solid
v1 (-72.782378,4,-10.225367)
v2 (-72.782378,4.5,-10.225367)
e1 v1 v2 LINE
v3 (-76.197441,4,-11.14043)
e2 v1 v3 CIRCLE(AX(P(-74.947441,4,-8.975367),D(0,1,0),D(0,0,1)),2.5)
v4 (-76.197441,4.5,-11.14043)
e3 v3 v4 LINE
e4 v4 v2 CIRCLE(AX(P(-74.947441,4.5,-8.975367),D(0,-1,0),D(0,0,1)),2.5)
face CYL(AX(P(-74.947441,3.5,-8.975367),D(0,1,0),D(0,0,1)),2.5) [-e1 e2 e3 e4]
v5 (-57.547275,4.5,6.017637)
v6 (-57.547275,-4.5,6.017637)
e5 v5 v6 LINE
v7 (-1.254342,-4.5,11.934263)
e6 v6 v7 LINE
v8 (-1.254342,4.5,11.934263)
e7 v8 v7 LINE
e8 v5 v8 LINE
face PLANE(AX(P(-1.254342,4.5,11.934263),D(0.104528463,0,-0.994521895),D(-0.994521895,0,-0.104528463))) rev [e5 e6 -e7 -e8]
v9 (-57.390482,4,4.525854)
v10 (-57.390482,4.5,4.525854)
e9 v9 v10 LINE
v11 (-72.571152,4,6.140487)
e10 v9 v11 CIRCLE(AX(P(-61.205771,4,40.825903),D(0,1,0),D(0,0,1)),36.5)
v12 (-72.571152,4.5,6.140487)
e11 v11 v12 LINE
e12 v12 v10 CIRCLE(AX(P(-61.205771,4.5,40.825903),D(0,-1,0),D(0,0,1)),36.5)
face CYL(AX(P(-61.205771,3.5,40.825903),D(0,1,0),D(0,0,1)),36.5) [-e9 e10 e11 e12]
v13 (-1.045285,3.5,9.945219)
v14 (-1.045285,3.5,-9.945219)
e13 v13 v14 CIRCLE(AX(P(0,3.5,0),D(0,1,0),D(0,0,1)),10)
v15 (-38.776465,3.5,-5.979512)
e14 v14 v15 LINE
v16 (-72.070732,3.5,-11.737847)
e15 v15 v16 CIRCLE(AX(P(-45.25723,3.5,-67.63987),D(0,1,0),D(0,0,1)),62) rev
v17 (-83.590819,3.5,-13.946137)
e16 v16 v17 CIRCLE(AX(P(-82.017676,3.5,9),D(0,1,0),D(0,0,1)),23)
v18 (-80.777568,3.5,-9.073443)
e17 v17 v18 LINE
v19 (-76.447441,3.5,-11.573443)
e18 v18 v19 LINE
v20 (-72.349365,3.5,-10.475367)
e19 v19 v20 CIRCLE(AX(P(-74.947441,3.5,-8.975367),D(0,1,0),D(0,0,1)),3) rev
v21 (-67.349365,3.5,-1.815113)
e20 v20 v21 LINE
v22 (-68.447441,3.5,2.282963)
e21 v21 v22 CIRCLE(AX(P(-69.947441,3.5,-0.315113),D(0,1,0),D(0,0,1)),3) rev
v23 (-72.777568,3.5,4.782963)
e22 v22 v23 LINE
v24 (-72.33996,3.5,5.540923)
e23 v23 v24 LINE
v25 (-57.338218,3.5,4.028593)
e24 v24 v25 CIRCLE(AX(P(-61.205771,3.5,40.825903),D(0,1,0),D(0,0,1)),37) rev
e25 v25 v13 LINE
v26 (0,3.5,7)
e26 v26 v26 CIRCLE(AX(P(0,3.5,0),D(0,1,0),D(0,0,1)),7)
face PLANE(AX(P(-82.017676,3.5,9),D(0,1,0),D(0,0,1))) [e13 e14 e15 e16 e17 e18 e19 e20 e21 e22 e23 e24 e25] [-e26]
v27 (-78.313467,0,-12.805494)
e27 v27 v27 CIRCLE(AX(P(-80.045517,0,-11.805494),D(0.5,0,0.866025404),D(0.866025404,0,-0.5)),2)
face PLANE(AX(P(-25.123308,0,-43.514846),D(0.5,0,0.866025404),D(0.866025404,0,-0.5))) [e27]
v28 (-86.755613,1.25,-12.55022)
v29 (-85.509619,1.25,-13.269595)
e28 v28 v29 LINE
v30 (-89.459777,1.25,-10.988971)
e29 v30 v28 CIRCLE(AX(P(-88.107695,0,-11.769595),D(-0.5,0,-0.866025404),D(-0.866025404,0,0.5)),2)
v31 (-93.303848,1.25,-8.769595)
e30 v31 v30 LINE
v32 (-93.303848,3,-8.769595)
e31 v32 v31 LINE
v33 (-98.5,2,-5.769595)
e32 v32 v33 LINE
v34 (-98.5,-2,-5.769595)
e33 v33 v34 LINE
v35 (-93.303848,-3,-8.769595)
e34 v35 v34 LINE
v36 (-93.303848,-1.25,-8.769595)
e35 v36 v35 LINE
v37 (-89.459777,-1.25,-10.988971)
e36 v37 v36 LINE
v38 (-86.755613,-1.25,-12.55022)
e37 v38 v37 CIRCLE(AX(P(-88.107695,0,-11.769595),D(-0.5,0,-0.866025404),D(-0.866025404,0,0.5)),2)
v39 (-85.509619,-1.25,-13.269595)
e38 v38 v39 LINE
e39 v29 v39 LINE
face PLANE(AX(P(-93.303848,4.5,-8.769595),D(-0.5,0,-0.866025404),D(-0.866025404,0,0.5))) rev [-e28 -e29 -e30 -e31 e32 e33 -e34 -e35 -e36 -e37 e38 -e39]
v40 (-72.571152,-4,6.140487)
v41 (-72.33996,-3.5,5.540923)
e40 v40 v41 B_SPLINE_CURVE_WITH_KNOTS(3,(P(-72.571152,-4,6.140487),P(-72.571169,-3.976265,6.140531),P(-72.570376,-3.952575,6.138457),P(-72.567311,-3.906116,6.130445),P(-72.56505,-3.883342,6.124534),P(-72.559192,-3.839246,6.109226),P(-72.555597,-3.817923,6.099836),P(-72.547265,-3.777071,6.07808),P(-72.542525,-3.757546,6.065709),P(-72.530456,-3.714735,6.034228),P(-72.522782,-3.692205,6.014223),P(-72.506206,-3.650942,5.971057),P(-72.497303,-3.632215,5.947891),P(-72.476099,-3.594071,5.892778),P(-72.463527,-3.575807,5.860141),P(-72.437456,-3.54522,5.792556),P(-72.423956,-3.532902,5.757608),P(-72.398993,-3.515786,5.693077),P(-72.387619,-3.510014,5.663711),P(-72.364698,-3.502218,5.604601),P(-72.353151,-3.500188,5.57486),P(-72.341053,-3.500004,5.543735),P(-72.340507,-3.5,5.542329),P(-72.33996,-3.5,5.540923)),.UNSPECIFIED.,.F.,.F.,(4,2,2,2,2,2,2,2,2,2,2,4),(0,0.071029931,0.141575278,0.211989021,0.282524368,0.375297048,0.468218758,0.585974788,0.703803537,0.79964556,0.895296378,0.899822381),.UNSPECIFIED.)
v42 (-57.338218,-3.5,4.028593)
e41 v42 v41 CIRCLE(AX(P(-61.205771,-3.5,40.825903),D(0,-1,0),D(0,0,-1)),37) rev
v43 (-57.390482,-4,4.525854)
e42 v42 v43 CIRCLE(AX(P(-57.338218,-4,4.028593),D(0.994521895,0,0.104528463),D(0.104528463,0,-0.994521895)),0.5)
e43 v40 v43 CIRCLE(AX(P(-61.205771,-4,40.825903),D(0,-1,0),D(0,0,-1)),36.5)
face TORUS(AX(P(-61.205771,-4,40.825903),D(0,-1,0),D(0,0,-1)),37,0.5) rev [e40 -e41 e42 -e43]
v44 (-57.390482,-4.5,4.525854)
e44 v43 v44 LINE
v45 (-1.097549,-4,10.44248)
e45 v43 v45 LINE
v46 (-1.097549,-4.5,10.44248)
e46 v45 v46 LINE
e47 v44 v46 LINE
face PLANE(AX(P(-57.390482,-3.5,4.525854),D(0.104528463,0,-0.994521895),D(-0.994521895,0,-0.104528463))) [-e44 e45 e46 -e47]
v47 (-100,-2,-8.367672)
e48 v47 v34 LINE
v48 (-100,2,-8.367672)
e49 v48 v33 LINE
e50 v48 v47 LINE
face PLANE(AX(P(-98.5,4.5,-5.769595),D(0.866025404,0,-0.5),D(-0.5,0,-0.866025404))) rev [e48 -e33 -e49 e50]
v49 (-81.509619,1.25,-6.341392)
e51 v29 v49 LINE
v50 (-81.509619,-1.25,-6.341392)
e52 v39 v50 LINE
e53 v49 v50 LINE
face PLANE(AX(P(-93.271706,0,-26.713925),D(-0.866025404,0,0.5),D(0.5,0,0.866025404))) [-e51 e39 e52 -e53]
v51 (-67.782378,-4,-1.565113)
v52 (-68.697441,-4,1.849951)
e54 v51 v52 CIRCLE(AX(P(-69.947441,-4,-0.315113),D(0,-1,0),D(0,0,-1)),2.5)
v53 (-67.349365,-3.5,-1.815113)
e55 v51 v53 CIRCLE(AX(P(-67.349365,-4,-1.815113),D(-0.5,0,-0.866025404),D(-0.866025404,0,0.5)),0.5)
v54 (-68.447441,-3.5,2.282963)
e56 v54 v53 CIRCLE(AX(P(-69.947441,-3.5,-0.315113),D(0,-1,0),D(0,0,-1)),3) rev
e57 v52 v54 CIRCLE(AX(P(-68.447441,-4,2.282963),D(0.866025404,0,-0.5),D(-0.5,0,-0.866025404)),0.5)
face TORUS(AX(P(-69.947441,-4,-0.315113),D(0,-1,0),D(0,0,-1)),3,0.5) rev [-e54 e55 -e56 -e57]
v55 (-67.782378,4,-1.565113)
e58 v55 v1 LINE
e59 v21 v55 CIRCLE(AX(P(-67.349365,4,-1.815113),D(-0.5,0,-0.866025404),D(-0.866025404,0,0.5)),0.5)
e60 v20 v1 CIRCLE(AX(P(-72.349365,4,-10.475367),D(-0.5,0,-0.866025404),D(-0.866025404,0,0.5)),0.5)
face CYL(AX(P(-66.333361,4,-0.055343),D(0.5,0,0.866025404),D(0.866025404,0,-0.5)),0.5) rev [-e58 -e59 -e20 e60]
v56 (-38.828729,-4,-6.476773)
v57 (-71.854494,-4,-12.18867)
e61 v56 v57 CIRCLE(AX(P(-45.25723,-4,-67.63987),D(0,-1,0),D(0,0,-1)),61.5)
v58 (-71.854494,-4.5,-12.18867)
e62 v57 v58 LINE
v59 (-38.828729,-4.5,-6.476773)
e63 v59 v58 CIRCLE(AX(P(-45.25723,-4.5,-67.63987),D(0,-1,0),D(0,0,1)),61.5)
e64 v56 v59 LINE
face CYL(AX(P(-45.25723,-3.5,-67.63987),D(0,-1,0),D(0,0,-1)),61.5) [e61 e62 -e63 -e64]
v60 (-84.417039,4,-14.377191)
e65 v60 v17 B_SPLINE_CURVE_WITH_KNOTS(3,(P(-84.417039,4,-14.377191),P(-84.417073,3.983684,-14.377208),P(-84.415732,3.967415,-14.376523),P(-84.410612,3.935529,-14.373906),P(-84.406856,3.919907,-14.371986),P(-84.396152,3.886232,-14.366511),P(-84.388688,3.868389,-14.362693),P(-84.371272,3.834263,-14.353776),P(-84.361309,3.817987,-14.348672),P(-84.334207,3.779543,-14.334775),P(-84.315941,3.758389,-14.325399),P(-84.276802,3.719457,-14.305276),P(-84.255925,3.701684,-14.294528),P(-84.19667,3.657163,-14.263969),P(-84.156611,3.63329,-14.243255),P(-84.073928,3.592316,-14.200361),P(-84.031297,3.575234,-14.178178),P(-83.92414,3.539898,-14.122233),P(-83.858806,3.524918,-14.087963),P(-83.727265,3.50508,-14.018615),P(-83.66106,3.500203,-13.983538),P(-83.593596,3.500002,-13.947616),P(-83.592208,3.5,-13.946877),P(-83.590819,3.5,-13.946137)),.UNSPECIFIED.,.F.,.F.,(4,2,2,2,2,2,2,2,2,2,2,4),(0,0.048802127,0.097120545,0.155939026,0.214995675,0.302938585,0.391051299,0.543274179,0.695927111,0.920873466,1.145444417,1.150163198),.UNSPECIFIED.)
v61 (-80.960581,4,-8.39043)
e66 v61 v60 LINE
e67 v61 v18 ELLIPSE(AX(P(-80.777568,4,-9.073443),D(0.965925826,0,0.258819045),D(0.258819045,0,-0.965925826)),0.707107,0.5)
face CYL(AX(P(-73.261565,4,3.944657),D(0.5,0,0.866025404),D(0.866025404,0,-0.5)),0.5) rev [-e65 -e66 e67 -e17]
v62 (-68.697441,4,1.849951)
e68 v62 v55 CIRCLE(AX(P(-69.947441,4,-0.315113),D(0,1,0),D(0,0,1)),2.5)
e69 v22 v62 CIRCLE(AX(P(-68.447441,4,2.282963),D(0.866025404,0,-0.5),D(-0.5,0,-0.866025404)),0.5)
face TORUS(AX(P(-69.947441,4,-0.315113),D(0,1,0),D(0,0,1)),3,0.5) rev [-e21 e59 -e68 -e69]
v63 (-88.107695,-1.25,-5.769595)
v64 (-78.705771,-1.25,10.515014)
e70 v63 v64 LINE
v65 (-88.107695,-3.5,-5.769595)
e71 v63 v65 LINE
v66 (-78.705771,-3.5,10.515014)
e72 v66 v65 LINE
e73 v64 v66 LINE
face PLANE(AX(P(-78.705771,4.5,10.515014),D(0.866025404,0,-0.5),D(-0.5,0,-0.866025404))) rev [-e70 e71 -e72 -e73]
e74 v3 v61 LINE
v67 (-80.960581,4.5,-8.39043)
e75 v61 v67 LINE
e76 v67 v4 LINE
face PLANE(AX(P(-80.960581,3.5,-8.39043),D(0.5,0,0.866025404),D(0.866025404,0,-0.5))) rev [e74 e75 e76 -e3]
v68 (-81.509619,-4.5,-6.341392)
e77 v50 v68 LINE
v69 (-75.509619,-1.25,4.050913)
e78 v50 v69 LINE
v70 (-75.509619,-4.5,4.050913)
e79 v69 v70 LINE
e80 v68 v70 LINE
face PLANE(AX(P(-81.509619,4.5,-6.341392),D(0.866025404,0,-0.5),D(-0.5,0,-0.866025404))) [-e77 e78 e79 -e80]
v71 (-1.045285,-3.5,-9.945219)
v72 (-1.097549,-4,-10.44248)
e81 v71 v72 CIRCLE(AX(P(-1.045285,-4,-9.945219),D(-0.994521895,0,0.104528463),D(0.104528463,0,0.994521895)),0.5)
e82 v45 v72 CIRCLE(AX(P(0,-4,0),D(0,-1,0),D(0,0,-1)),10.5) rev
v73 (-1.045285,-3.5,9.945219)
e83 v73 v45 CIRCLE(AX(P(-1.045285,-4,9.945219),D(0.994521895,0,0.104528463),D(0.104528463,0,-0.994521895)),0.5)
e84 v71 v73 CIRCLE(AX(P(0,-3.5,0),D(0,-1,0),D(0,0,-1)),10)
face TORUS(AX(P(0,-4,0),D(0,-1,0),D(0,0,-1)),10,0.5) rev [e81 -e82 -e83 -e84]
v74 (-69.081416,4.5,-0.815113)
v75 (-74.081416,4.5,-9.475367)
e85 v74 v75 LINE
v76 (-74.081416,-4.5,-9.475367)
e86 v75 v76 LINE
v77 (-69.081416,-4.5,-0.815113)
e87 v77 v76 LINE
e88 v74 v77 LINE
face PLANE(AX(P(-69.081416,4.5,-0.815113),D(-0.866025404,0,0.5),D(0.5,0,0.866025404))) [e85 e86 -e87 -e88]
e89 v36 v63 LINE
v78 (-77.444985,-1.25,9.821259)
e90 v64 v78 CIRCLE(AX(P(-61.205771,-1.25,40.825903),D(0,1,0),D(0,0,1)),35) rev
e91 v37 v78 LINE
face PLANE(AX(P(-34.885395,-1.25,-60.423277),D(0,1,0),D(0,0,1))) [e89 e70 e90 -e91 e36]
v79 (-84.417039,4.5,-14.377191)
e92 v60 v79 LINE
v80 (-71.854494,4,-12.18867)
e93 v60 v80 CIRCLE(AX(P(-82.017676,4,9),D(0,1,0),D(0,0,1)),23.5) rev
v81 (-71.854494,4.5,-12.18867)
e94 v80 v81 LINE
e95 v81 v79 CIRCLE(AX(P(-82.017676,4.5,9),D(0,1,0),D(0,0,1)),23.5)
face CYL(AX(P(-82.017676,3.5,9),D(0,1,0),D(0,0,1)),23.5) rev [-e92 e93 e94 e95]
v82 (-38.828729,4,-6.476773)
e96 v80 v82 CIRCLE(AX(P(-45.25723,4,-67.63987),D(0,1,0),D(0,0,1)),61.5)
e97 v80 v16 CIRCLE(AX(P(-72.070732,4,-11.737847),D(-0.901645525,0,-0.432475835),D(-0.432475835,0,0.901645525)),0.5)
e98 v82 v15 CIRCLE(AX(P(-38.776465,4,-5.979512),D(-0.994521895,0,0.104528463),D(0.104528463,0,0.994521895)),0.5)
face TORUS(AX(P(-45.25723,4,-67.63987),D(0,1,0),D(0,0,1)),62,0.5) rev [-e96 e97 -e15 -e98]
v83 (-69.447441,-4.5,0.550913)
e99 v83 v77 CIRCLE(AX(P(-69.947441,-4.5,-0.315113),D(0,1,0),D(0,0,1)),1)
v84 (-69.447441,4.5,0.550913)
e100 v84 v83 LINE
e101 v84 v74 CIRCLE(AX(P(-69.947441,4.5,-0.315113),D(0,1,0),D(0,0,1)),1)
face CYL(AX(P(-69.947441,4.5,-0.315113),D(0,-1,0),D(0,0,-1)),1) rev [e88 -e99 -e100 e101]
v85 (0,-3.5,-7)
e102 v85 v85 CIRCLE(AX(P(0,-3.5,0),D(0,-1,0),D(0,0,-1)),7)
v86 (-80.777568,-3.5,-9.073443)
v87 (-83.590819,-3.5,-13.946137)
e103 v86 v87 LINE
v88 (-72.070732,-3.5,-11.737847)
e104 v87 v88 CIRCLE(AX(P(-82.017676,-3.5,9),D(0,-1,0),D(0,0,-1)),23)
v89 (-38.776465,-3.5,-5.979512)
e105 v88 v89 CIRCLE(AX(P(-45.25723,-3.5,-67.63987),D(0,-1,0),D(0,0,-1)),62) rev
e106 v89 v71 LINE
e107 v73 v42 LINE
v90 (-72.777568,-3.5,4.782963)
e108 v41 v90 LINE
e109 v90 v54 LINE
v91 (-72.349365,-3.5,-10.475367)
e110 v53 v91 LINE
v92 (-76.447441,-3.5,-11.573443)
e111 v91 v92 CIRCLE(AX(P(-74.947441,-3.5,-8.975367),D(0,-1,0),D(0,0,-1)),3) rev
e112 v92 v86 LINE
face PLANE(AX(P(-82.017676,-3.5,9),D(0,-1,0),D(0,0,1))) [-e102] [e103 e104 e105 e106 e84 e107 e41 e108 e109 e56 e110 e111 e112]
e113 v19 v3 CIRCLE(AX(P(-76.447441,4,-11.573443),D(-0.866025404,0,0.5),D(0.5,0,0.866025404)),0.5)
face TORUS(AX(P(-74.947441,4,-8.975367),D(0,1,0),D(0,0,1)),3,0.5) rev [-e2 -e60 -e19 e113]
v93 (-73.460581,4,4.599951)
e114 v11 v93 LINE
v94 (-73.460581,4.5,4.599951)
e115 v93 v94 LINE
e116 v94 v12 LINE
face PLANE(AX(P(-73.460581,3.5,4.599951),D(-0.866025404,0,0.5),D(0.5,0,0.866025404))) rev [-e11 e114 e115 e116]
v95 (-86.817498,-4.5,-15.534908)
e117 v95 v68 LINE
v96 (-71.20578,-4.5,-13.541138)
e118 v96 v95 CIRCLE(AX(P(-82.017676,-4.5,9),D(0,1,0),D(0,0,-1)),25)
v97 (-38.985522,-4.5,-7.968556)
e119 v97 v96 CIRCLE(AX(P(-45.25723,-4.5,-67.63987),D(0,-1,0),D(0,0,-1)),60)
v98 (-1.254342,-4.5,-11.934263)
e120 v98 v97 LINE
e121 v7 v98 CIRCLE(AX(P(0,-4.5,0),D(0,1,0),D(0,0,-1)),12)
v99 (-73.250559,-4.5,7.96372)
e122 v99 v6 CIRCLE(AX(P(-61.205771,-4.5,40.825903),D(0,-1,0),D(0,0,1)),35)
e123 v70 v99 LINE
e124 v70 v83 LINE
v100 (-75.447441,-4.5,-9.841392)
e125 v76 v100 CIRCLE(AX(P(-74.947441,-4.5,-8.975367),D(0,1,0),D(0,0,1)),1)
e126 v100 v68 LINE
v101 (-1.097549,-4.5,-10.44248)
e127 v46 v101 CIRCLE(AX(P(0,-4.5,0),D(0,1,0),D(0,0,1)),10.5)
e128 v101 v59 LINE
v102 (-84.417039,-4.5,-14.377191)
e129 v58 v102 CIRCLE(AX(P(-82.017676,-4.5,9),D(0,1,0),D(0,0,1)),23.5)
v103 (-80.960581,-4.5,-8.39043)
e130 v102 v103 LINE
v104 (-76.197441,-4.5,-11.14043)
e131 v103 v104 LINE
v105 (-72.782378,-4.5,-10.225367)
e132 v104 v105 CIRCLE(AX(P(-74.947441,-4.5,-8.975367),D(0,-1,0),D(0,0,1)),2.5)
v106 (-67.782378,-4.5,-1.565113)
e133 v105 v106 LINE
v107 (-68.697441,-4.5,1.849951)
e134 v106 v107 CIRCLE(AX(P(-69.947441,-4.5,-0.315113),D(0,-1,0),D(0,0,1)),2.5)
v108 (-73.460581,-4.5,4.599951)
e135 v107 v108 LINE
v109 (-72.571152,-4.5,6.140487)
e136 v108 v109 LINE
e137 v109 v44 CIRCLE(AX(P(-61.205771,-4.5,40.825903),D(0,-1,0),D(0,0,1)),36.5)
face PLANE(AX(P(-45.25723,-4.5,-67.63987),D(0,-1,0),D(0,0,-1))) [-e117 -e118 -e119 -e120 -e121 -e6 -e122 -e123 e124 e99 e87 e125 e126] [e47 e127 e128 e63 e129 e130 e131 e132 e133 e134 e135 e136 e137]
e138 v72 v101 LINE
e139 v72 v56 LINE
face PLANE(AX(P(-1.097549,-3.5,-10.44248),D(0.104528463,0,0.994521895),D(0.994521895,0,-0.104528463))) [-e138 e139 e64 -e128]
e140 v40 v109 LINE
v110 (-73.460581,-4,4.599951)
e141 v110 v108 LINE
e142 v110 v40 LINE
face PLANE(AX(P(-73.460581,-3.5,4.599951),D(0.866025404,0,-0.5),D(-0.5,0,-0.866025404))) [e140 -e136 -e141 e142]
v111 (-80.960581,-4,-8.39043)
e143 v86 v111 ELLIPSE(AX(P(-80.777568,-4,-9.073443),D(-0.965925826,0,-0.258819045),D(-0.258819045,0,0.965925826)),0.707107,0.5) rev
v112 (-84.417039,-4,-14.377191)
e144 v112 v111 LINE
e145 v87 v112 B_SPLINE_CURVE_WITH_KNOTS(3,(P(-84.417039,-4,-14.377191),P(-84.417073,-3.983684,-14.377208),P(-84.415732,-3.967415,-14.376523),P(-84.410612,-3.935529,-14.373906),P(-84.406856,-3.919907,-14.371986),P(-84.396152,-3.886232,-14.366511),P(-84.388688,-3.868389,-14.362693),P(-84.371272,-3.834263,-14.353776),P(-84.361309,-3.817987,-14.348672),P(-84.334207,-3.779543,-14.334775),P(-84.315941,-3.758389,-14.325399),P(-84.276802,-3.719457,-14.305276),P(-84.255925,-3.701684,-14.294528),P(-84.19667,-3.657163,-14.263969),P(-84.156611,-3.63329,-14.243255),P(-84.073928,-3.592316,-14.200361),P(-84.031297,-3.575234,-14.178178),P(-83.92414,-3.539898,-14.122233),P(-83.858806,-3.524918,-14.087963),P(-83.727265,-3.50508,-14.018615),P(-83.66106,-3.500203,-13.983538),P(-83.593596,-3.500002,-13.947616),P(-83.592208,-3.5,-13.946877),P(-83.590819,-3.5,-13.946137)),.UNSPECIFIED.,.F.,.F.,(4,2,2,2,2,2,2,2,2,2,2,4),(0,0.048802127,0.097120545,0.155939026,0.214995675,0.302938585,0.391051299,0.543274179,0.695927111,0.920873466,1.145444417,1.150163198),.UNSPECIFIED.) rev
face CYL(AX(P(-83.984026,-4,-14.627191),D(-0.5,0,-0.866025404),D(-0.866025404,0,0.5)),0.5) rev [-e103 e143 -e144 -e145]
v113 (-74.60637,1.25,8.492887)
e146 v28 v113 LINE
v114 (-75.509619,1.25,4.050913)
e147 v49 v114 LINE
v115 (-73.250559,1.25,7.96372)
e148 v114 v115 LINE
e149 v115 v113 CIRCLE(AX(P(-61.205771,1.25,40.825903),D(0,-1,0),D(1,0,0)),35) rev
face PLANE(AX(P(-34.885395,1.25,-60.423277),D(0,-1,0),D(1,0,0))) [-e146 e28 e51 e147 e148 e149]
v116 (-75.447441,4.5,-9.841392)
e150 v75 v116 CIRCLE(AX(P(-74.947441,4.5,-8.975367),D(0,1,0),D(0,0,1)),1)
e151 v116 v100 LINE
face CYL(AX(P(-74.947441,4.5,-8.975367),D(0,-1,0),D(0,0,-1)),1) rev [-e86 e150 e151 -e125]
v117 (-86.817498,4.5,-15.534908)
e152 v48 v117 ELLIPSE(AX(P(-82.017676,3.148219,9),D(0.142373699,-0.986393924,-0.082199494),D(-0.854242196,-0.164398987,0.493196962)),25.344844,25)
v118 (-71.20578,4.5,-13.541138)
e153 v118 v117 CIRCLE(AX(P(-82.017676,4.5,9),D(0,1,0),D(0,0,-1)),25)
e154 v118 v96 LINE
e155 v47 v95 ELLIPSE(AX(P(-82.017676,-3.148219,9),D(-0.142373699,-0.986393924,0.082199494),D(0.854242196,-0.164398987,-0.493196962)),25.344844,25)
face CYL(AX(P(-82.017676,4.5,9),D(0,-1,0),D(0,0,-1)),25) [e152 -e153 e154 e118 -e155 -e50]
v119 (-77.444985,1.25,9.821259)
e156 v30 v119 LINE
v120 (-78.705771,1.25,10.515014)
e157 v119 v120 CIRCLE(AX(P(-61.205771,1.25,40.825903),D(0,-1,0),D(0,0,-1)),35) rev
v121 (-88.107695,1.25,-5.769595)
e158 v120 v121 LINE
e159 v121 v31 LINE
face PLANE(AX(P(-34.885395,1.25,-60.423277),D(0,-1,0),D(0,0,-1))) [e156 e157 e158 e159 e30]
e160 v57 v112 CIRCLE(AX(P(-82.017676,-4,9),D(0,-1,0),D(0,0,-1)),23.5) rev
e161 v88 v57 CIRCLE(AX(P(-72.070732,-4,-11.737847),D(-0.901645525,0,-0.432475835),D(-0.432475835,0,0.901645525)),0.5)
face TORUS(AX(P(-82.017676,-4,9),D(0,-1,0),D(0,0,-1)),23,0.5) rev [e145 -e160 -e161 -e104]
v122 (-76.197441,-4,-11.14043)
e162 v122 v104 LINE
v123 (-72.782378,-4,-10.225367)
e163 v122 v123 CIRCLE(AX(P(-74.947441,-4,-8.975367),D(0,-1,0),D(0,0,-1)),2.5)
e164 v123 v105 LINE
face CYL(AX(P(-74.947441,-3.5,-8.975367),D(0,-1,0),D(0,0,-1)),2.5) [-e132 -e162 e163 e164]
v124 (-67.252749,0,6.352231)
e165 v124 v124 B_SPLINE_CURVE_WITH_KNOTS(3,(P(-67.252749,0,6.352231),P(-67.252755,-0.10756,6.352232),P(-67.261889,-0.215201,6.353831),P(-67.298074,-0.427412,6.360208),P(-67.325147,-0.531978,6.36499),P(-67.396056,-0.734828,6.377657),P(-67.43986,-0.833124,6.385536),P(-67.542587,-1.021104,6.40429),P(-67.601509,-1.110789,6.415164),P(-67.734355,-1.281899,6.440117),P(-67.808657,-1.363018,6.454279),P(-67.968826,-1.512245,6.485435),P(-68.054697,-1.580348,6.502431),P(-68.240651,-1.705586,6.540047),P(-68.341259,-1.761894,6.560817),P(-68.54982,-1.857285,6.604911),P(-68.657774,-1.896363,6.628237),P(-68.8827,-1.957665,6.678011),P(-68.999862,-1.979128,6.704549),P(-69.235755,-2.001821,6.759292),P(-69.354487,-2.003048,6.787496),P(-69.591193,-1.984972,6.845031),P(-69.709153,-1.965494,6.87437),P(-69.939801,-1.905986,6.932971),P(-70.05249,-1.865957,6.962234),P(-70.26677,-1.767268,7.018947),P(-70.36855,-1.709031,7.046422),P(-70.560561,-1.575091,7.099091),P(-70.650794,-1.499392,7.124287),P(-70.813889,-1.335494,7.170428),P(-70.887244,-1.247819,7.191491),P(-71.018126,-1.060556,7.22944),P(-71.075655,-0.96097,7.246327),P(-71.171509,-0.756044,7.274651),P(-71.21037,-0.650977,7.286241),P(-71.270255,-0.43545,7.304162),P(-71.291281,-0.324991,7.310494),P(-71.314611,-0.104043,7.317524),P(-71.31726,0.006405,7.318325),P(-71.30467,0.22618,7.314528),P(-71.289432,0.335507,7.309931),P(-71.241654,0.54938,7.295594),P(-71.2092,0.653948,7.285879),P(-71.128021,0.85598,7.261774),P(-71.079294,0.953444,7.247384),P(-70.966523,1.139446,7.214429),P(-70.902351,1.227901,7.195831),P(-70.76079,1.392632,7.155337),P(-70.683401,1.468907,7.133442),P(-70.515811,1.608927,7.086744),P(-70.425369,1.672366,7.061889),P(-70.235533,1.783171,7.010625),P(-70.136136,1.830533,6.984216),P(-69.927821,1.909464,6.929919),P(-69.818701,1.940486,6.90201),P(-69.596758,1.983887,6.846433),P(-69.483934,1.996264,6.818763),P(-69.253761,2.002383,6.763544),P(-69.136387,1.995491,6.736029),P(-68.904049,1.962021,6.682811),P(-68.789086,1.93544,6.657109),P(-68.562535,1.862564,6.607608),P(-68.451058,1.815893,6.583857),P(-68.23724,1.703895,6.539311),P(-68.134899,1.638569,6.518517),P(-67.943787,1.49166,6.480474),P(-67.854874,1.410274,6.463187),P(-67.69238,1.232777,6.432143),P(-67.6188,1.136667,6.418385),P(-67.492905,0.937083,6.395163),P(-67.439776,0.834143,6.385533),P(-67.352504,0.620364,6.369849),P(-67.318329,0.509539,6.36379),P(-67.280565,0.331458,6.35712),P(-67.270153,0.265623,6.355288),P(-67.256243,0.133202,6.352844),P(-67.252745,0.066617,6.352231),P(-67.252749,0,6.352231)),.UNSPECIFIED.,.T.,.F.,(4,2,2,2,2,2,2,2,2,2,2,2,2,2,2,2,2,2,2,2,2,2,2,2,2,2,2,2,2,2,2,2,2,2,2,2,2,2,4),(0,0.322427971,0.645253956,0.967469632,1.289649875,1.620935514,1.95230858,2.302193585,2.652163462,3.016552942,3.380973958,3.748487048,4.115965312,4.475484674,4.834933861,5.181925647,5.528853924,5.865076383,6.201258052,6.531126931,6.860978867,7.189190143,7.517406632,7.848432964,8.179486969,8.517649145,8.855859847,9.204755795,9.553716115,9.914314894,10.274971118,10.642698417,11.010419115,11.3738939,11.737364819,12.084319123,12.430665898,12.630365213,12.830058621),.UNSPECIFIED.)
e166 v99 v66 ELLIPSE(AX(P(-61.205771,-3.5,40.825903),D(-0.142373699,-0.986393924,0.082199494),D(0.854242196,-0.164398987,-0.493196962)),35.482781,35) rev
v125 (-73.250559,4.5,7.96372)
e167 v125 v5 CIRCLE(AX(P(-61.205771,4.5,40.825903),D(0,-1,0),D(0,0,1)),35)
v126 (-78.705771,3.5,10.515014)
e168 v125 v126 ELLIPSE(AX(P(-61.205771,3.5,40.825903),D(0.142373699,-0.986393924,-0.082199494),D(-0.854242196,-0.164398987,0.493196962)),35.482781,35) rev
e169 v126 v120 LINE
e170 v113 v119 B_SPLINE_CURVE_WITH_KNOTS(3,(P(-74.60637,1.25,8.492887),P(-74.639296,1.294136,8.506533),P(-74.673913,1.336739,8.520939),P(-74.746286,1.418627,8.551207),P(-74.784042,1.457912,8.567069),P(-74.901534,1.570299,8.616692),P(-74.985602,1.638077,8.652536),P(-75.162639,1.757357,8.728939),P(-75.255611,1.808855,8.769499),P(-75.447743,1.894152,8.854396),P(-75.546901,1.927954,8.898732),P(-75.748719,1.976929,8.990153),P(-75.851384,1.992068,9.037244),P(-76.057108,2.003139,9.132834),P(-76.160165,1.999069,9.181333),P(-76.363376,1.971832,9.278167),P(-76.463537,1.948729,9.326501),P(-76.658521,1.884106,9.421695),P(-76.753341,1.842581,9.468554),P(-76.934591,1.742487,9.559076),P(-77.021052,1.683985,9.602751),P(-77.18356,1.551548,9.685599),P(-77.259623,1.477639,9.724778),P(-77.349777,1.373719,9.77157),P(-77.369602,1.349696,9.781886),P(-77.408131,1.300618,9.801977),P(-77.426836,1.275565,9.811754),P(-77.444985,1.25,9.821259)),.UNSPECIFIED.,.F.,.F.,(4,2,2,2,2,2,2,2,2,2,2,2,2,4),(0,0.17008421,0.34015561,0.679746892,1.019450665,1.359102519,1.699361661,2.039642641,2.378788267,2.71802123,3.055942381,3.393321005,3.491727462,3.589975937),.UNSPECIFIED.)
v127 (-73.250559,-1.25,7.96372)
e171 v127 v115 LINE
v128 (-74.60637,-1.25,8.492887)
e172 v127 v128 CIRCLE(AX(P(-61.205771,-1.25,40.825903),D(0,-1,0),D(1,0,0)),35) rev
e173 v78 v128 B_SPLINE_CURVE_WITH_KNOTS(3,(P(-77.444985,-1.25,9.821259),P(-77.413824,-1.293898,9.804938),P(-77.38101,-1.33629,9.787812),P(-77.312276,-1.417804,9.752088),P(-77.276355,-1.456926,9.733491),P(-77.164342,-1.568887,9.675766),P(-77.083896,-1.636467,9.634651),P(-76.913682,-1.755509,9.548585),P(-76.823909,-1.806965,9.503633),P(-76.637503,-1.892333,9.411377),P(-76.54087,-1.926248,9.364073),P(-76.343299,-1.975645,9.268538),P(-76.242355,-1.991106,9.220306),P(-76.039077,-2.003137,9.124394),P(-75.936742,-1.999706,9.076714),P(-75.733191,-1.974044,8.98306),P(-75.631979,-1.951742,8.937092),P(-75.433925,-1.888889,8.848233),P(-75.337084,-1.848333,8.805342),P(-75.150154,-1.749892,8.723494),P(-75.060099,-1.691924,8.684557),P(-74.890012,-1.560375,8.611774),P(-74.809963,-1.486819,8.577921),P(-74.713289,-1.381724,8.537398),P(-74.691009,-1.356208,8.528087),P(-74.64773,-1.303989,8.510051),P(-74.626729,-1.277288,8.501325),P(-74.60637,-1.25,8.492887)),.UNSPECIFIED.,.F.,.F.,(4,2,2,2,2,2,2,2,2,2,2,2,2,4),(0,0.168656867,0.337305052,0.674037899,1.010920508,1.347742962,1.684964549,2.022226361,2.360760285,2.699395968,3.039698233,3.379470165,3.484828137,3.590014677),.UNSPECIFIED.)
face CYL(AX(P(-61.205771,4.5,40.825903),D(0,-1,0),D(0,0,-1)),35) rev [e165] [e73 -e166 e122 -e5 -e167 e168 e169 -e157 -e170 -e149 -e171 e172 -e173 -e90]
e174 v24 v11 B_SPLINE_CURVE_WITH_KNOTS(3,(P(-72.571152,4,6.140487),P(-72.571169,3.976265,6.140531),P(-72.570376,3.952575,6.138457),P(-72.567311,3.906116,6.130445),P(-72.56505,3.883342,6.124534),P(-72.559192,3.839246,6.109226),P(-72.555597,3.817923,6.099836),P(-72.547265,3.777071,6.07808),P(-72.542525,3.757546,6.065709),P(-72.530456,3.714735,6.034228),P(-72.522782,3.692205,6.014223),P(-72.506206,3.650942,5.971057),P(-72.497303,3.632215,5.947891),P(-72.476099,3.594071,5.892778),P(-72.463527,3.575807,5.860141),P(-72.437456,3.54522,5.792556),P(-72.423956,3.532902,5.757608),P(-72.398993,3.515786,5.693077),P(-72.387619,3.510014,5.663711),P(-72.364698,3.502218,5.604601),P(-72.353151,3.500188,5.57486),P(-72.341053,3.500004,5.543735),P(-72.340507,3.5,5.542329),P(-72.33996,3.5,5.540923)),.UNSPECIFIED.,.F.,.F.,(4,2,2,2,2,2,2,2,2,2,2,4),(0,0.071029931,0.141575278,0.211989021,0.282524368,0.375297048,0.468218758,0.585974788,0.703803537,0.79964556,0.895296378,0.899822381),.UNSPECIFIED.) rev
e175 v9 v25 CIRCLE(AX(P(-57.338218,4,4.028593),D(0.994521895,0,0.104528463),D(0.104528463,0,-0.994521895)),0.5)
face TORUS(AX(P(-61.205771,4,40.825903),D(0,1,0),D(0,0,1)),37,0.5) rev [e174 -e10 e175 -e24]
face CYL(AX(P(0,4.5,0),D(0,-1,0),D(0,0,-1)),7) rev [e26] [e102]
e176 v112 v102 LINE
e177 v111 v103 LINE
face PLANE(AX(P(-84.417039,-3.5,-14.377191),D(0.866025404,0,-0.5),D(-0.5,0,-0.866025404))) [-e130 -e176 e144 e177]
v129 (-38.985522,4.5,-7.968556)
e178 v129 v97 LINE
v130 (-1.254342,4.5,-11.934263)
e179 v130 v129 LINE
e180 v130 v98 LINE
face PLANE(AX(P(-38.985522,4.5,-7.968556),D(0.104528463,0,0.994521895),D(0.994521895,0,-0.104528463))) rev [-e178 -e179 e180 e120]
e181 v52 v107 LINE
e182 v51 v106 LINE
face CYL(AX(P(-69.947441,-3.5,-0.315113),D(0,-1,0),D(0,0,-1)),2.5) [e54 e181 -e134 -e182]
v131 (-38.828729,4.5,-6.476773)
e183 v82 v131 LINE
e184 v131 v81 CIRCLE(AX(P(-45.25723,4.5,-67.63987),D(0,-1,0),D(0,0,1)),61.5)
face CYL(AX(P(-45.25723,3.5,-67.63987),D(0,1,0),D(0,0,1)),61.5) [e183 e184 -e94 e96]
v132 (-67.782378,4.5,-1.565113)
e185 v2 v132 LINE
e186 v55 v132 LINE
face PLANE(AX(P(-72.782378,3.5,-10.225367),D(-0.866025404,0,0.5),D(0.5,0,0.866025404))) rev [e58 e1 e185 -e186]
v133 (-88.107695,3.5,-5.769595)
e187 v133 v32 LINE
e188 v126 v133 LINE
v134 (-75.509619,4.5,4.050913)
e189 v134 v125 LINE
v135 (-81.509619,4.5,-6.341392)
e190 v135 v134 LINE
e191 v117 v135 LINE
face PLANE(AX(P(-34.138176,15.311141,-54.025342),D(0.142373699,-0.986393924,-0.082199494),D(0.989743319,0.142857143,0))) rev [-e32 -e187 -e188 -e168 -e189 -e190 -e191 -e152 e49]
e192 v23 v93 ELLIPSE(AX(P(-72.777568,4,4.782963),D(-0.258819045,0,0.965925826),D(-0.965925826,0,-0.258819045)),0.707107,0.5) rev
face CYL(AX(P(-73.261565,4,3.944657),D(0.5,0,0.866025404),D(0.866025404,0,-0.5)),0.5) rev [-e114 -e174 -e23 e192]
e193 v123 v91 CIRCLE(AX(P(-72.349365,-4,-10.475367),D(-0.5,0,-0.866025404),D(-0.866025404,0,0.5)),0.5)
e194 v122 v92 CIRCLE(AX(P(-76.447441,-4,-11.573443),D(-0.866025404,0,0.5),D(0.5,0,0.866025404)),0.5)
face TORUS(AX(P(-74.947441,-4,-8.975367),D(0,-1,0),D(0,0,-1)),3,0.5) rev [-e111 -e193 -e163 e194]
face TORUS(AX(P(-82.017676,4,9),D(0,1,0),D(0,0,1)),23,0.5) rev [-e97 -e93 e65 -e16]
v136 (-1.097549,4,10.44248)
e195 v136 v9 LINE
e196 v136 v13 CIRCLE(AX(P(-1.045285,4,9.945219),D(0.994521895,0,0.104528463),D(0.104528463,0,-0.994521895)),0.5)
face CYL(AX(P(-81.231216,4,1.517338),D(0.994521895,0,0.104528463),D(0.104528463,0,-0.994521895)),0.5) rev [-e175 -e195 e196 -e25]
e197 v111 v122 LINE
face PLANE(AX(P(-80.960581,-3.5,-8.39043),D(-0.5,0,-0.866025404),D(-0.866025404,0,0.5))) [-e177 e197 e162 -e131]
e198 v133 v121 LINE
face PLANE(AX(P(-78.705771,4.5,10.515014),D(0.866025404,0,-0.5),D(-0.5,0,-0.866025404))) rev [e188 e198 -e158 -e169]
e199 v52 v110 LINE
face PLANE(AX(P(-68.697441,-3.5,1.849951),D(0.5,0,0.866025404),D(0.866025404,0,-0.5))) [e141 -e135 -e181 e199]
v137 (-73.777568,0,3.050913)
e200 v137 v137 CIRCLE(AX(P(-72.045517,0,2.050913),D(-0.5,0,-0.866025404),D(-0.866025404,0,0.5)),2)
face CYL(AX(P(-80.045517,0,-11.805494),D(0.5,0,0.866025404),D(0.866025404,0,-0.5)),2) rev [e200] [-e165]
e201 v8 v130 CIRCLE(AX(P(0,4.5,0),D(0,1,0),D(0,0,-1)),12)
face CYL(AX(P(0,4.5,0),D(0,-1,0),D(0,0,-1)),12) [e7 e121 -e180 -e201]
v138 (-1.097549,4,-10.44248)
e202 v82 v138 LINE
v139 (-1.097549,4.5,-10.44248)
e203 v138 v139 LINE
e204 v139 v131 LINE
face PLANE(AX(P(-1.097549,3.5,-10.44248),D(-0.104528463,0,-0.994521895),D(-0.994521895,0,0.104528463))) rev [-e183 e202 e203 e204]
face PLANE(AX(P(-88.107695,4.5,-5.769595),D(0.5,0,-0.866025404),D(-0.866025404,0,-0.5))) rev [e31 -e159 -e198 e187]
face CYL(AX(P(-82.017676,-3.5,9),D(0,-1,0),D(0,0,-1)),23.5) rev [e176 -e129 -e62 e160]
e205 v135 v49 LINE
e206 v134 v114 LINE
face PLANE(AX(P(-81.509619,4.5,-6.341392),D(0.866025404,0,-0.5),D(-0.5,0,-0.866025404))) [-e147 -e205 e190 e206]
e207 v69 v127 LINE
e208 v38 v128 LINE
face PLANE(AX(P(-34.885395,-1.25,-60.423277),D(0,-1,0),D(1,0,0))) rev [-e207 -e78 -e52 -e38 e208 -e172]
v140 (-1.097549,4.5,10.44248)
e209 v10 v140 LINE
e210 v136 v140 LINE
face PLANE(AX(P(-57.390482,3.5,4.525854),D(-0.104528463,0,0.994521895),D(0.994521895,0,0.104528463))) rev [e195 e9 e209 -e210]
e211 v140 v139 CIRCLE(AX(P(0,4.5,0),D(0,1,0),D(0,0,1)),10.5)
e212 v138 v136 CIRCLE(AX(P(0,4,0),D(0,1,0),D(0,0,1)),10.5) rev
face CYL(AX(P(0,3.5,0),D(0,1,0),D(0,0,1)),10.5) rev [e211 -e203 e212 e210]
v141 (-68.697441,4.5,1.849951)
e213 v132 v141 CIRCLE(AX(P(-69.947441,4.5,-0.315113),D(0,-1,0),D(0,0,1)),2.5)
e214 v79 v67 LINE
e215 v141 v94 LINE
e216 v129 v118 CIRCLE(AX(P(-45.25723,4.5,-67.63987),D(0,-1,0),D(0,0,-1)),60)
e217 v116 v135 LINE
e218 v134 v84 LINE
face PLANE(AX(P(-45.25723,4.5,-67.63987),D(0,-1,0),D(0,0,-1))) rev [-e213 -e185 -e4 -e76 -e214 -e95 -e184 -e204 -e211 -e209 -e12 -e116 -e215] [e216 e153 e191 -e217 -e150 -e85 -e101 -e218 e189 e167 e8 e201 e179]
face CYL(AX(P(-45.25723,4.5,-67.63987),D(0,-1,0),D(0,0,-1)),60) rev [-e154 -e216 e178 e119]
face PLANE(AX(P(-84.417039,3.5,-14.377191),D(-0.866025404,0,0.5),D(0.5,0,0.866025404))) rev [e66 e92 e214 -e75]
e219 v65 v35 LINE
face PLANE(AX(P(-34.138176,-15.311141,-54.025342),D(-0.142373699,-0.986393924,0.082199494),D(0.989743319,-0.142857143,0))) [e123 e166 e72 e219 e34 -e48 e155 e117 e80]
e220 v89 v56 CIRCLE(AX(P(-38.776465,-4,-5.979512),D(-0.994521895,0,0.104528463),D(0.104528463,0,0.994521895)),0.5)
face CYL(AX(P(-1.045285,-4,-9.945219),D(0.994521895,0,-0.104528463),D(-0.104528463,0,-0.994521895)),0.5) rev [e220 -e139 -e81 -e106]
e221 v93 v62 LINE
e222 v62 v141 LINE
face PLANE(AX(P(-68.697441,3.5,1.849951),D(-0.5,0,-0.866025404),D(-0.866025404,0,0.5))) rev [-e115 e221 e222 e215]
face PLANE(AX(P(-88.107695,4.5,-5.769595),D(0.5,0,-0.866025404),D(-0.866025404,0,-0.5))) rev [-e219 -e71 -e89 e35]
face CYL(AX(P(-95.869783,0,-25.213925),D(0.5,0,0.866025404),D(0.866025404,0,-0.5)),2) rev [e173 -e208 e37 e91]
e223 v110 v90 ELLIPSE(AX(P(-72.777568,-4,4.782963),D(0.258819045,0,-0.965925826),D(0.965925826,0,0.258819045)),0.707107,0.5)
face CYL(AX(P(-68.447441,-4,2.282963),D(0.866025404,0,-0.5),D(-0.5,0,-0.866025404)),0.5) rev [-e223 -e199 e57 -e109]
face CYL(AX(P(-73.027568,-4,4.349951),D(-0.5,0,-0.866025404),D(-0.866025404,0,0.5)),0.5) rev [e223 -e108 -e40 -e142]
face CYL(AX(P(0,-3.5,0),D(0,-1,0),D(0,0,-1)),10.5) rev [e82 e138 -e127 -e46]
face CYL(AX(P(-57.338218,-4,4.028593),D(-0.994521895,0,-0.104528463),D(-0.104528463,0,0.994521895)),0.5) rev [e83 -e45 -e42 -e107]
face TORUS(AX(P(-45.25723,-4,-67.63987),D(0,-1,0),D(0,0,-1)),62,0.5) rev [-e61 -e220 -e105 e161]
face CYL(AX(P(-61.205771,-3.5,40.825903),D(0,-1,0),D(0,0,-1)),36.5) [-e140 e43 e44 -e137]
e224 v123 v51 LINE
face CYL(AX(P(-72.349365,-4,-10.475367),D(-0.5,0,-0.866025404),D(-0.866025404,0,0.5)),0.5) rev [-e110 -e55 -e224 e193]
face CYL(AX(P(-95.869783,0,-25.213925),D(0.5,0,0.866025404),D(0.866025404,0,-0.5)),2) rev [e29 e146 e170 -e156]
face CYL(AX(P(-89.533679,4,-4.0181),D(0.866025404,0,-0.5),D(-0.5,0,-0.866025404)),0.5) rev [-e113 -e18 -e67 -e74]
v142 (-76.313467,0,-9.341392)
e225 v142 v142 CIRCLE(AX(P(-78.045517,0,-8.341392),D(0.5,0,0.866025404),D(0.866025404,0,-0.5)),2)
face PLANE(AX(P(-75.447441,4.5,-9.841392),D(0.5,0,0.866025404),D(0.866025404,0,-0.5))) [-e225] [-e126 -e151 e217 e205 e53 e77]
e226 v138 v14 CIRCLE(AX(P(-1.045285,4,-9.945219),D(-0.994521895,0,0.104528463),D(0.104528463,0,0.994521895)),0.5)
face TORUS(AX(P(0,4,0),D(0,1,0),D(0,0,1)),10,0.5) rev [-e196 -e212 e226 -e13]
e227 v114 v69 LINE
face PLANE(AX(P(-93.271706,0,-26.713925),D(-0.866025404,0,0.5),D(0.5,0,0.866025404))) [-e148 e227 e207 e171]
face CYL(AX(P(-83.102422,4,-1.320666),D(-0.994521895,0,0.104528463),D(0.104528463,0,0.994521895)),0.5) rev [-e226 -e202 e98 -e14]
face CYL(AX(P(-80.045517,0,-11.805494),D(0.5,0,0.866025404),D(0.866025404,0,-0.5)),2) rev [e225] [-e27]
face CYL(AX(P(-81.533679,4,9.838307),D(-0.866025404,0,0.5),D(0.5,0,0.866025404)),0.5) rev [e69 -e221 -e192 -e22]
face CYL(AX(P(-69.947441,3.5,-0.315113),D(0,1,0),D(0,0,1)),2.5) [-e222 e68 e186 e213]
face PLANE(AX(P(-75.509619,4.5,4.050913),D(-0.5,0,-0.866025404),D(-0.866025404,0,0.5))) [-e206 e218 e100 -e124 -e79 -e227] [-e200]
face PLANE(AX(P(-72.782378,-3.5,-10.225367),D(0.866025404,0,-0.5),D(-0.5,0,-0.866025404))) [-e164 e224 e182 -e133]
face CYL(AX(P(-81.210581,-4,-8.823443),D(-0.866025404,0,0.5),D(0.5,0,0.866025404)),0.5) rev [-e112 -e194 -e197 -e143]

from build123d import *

# Parameters (mm, degrees)
SKETCH2_R               = 7
BOSS_EXTRUDE1_DEPTH     = 4.5
CUT_EXTRUDE1_START      = -8
CUT_EXTRUDE1_DEPTH      = 24.518120701
CUT_EXTRUDE4_DEPTH      = 93.949210641
CUT_EXTRUDE4_DEPTH_BACK = 4
SKETCH3_5_R             = 2
CUT_EXTRUDE2_DEPTH      = 93.949210641
CUT_EXTRUDE2_DEPTH_BACK = 93.949210641
CUT_EXTRUDE3_DEPTH      = 1
FILLET1_R               = 0.5
FILLET1_OF_MIRROR1_R    = 0.5


# Read off the part's stored shape, not the designer's step: Cut-Extrude1
with BuildPart() as part:
    # Sketch2 → Boss-Extrude1 (new, symmetric)
    with BuildSketch(Plane(origin=(0, 0, 0), x_dir=(1, 0, 0), z_dir=(0, 1, 0))):
        with BuildLine():
            Line((-38.985522111, 7.968555867), (-1.254341559, 11.934262744))
            ThreePointArc((-1.254341559, 11.934262744), (12, 0), (-1.254341559, -11.934262744))
            Line((-1.254341559, -11.934262744), (-57.547275152, -6.017637008))
            ThreePointArc((-57.547275152, -6.017637008), (-68.482680545, -6.590737321), (-78.705771366, -10.515014214))
            Line((-78.705771366, -10.515014214), (-88.107695155, 5.769595477))
            Line((-88.107695155, 5.769595477), (-93.303847577, 8.769595477))
            Line((-93.303847577, 8.769595477), (-98.5, 5.769595477))
            Line((-98.5, 5.769595477), (-100, 8.367671688))
            ThreePointArc((-100, 8.367671688), (-86.438642867, 15.605996242), (-71.205780018, 13.541138114))
            ThreePointArc((-71.205780018, 13.541138114), (-55.482588048, 8.517606008), (-38.985522111, 7.968555867))
        make_face()
        with Locations(Location((0, 0, 0), (0, 0, 270))):
            Circle(SKETCH2_R, mode=Mode.SUBTRACT)
        with BuildLine():
            Line((-81.509618943, 6.341392247), (-75.509618943, -4.050912599))
            Line((-75.509618943, -4.050912599), (-69.447441117, -0.550912599))
            ThreePointArc((-69.447441117, -0.550912599), (-68.98151529, 0.05629376), (-69.081415713, 0.815112805))
            Line((-69.081415713, 0.815112805), (-74.081415713, 9.475366843))
            ThreePointArc((-74.081415713, 9.475366843), (-74.688622072, 9.941292669), (-75.447441117, 9.841392247))
            Line((-75.447441117, 9.841392247), (-81.509618943, 6.341392247))
        make_face(mode=Mode.SUBTRACT)
    extrude(amount=BOSS_EXTRUDE1_DEPTH, both=True)

    # Cut-Extrude1 outline → Cut-Extrude1 (cut)
    with BuildSketch(Plane(origin=(-23.123308126, 0, -40.050744514), x_dir=(0.8660254037844396, 0, -0.49999999999999833), z_dir=(0.49999999999999833, 0, 0.8660254037844396)).offset(CUT_EXTRUDE1_START)):
        with BuildLine():
            Line((-82.418704534, 1.25), (-82.418704534, -1.25))
            Line((-82.418704534, -1.25), (-71.979954034, -1.25))
            ThreePointArc((-71.979954034, -1.25), (-70.418704534, -2), (-68.857455035, -1.25))
            Line((-68.857455035, -1.25), (-67.418704534, -1.25))
            Line((-67.418704534, -1.25), (-67.418704534, 1.25))
            Line((-67.418704534, 1.25), (-68.857455035, 1.25))
            ThreePointArc((-68.857455035, 1.25), (-70.418704534, 2), (-71.979954034, 1.25))
            Line((-71.979954034, 1.25), (-82.418704534, 1.25))
        make_face()
    extrude(amount=CUT_EXTRUDE1_DEPTH, mode=Mode.SUBTRACT)

    # Sketch3<5> → Cut-Extrude4 (cut, two sides: drawn at the far end of the back side and taken through both)
    with BuildSketch(Plane(origin=(-23.123308126, 0, -40.050744514), x_dir=(0.8660254037844396, 0, -0.49999999999999833), z_dir=(0.49999999999999833, 0, 0.8660254037844396)).offset(-CUT_EXTRUDE4_DEPTH_BACK)):
        with Locations((-63.418704534, 0)):
            Circle(SKETCH3_5_R)
    extrude(amount=CUT_EXTRUDE4_DEPTH + CUT_EXTRUDE4_DEPTH_BACK, mode=Mode.SUBTRACT)

    # Sketch3<3> → Cut-Extrude2 (cut, two sides: drawn at the far end of the back side and taken through both)
    with BuildSketch(Plane(origin=(-23.123308126, 0, -40.050744514), x_dir=(0.8660254037844396, 0, -0.49999999999999833), z_dir=(0.49999999999999833, 0, 0.8660254037844396)).offset(-CUT_EXTRUDE2_DEPTH_BACK)):
        Polygon((-67.418704534, 4.5), (-82.418704534, 4.5), (-82.418704534, 2), align=None)
        Polygon((-82.418704534, -4.5), (-82.418704534, -2), (-67.418704534, -4.5), align=None)
    extrude(amount=CUT_EXTRUDE2_DEPTH + CUT_EXTRUDE2_DEPTH_BACK, mode=Mode.SUBTRACT)

    # Sketch4 → Cut-Extrude3 (cut)
    with BuildSketch(Plane(origin=(0, 4.5, 0), x_dir=(1, 0, 0), z_dir=(0, 1, 0))):
        with BuildLine():
            Line((-84.417038698, 14.377190981), (-80.960580838, 8.390430352))
            Line((-80.960580838, 8.390430352), (-76.197441117, 11.140430352))
            ThreePointArc((-76.197441117, 11.140430352), (-74.300393504, 11.390181409), (-72.782377607, 10.225366843))
            Line((-72.782377607, 10.225366843), (-67.782377607, 1.565112805))
            ThreePointArc((-67.782377607, 1.565112805), (-67.532626551, -0.331934808), (-68.697441117, -1.849950704))
            Line((-68.697441117, -1.849950704), (-73.460580838, -4.599950704))
            Line((-73.460580838, -4.599950704), (-72.571151937, -6.14048675))
            ThreePointArc((-72.571151937, -6.14048675), (-65.066176866, -4.530624461), (-57.390482457, -4.525854165))
            Line((-57.390482457, -4.525854165), (-1.097548864, -10.442479901))
            ThreePointArc((-1.097548864, -10.442479901), (10.5, 0), (-1.097548864, 10.442479901))
            Line((-1.097548864, 10.442479901), (-38.828729416, 6.476773024))
            ThreePointArc((-38.828729416, 6.476773024), (-55.738222001, 7.039549419), (-71.854493771, 12.188669828))
            ThreePointArc((-71.854493771, 12.188669828), (-77.984484997, 14.151314674), (-84.417038698, 14.377190981))
        make_face()
    cut_extrude3 = extrude(amount=-CUT_EXTRUDE3_DEPTH, mode=Mode.SUBTRACT)

    # Fillet1
    fillet1_edges = [part.edges().sort_by_distance(p)[0] for p in [
        (-77.984484997, 3.5, -14.151314674),
        (-55.738222001, 3.5, -7.039549419),
        (-19.96313914, 3.5, -8.459626463),
        (10.5, 3.5, 0),
        (-29.24401566, 3.5, 7.484167033),
        (-65.066176866, 3.5, 4.530624461),
        (-73.015866387, 3.5, 5.370218727),
        (-71.079010977, 3.5, 3.224950704),
        (-67.532626551, 3.5, 0.331934808),
        (-70.282377607, 3.5, -5.895239824),
        (-74.300393504, 3.5, -11.390181409),
        (-78.579010977, 3.5, -9.765430352),
        (-82.688809768, 3.5, -11.383810667),
    ]]
    fillet(fillet1_edges, radius=FILLET1_R)

    # Mirror1: Cut-Extrude3 across plane
    add(cut_extrude3.mirror(Plane.ZX), mode=Mode.SUBTRACT)

    # Fillet1 of Mirror1
    fillet1_of_mirror1_edges = [part.edges().sort_by_distance(p)[0] for p in [
        (-77.984484997, -3.5, -14.151314674),
        (-55.738222001, -3.5, -7.039549419),
        (-19.96313914, -3.5, -8.459626463),
        (10.5, -3.5, 0),
        (-29.24401566, -3.5, 7.484167033),
        (-65.066176866, -3.5, 4.530624461),
        (-73.015866387, -3.5, 5.370218727),
        (-71.079010977, -3.5, 3.224950704),
        (-67.532626551, -3.5, 0.331934808),
        (-70.282377607, -3.5, -5.895239824),
        (-74.300393504, -3.5, -11.390181409),
        (-78.579010977, -3.5, -9.765430352),
        (-82.688809768, -3.5, -11.383810667),
    ]]
    fillet(fillet1_of_mirror1_edges, radius=FILLET1_OF_MIRROR1_R)


solid = part.part
